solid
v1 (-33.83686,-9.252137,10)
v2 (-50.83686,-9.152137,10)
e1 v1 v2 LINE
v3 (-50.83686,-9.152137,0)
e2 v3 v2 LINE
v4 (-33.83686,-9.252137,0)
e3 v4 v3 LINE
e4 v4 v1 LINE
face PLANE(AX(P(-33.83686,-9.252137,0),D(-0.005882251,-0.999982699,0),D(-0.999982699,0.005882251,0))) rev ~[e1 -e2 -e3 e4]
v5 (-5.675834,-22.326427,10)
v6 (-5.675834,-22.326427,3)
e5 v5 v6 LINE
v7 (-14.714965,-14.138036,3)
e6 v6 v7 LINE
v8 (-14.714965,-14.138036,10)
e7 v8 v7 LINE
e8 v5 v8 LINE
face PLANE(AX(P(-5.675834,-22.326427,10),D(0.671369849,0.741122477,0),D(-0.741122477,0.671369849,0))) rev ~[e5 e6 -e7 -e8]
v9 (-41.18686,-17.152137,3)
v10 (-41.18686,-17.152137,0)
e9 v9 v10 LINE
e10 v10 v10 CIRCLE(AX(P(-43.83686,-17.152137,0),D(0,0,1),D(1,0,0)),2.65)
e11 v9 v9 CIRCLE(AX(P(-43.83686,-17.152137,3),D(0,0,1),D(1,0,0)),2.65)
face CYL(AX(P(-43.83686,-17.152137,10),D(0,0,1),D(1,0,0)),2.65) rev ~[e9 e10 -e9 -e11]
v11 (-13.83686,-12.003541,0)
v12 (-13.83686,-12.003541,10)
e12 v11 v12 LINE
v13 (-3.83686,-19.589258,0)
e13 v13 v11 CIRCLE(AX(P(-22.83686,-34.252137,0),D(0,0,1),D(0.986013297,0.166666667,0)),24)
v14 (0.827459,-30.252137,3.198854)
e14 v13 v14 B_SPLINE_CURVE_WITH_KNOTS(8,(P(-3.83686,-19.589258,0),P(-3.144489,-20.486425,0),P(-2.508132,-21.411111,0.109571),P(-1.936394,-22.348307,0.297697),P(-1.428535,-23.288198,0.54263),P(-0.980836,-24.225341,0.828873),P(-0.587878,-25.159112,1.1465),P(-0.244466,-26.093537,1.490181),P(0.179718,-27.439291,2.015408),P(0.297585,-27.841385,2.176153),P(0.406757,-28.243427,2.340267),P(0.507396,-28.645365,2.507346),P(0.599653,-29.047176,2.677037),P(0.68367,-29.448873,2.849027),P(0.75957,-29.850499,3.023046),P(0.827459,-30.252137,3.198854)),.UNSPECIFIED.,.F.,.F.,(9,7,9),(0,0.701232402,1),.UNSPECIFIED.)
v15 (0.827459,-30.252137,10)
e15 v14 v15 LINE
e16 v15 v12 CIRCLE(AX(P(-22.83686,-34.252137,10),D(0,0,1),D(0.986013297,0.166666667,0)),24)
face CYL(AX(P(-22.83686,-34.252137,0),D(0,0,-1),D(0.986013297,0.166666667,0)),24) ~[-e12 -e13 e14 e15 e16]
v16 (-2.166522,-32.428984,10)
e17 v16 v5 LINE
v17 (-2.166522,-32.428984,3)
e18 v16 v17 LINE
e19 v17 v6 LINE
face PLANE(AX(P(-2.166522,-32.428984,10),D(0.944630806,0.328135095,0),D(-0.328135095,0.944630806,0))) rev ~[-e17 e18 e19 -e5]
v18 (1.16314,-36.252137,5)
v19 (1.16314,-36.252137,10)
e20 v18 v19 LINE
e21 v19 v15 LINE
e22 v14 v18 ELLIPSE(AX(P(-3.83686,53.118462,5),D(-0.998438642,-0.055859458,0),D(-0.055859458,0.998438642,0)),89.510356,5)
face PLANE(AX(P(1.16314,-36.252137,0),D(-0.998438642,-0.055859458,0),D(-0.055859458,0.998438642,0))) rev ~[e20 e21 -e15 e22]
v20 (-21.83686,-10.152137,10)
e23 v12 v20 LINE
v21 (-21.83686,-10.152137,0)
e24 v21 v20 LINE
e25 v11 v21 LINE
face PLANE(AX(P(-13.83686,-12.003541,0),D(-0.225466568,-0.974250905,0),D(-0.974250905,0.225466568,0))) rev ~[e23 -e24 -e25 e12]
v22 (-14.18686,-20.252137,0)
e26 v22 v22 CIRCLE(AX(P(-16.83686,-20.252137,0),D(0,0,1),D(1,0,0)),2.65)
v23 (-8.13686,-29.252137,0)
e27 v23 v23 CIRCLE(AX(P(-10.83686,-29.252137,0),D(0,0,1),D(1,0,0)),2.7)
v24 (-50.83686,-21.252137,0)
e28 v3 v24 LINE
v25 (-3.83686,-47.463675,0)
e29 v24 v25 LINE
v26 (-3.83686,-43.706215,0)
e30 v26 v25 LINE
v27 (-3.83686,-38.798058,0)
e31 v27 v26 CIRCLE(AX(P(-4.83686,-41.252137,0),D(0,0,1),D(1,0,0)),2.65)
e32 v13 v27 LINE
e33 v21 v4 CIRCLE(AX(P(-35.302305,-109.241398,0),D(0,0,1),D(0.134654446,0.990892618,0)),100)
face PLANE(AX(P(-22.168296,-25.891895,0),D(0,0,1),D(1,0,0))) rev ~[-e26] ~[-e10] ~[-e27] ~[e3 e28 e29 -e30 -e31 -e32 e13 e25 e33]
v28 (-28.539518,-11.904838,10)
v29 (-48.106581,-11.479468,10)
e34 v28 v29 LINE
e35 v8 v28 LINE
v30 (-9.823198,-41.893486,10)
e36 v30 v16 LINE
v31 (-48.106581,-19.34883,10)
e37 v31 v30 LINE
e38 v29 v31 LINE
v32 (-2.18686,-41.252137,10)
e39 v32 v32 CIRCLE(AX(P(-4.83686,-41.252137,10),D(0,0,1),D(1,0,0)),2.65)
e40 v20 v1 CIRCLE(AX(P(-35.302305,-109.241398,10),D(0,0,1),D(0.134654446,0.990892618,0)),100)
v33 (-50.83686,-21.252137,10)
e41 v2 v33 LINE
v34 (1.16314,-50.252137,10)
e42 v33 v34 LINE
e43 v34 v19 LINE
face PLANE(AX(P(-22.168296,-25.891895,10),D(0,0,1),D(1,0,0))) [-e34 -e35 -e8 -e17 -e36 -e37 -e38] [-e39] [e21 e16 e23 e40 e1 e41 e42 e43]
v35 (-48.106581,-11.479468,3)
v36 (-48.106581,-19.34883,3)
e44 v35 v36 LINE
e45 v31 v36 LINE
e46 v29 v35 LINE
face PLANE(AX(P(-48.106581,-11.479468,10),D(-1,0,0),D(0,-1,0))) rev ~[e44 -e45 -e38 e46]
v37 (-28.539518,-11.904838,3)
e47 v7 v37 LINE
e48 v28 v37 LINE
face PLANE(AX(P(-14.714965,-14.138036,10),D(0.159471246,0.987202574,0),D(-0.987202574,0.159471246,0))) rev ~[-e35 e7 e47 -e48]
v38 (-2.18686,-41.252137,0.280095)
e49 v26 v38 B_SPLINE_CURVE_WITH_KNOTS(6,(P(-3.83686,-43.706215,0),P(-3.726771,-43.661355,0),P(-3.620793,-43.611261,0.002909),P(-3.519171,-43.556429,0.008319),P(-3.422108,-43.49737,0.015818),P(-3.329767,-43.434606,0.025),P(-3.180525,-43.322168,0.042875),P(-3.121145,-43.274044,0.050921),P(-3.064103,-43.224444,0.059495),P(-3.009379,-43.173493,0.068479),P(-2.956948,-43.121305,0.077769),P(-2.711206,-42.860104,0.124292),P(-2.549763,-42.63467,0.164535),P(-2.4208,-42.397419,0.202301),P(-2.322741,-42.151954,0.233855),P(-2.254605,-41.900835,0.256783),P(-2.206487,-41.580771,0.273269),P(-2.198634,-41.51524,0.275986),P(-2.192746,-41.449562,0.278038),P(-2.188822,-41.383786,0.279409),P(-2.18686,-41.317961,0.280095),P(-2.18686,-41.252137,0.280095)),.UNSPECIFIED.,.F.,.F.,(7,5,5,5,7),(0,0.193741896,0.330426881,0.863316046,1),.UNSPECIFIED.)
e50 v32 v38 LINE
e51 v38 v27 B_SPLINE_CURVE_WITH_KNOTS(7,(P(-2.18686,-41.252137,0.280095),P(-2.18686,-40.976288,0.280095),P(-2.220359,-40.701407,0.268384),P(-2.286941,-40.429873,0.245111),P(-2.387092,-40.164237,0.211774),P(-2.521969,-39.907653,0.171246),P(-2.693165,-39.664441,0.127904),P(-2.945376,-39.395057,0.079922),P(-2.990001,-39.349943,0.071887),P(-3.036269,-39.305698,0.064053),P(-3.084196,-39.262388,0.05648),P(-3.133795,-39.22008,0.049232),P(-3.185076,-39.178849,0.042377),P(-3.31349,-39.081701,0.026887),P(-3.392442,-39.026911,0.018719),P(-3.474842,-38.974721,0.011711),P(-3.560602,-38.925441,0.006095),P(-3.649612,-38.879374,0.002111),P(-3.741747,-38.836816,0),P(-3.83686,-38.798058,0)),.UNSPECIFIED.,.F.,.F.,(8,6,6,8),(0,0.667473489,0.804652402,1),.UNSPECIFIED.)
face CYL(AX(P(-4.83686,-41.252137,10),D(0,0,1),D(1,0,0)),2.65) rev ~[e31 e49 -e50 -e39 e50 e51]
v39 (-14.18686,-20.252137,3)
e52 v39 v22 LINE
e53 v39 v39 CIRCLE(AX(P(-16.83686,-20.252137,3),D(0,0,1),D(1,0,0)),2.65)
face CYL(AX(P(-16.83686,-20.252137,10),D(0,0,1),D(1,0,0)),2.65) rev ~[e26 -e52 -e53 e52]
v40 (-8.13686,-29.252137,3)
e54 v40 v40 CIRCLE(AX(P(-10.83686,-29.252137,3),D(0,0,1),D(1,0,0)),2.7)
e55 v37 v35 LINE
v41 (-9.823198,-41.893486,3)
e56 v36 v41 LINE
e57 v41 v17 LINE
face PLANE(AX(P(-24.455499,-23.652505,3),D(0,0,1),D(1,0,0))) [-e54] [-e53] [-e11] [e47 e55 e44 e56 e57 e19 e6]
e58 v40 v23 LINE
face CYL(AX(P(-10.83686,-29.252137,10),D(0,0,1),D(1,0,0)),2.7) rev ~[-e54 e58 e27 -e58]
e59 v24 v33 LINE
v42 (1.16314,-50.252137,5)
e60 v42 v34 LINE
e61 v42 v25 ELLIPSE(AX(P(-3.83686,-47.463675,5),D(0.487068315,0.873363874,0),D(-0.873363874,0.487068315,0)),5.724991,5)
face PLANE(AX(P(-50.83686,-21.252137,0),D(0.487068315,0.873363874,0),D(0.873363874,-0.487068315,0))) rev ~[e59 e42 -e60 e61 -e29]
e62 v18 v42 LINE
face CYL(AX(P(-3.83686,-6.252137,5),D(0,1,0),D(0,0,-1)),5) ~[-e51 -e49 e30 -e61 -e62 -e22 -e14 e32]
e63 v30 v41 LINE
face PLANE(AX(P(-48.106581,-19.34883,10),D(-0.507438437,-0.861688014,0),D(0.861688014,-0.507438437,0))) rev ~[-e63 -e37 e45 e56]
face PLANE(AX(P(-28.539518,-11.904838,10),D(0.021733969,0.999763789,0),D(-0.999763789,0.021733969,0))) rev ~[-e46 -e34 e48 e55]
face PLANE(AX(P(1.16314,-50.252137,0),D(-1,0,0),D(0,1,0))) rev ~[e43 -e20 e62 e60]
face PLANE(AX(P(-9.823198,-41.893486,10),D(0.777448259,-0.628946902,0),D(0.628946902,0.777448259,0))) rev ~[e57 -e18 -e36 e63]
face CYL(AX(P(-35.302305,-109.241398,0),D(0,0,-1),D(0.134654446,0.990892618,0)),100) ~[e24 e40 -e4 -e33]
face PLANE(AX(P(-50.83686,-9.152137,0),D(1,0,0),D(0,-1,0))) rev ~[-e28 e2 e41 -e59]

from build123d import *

# Parameters (mm, degrees)
F1_DEPTH    = 10
F2_R        = 2.65
F2_R_2      = 2.7
F3_DEPTH    = 10.001
F4_T1_DEPTH = 74
F6_DEPTH    = 7


# Not quite as in the source:
# - a fillet or chamfer that OpenCascade refuses, or shapes differently, is made with other operations: its cross-section is extruded or revolved along the edge and cut away or added


with BuildPart() as f1:
    # F0 (on Top) → F1 (new body)
    with BuildSketch(Plane.XY):
        with BuildLine():
            Line((-33.8368600405, -9.2521366523), (-50.8368600405, -9.1521366523))
            Line((-50.8368600405, -9.1521366523), (-50.8368600405, -21.2521366523))
            Line((-50.8368600405, -21.2521366523), (1.1631399595, -50.2521366523))
            Line((1.1631399595, -50.2521366523), (1.1631399595, -36.2521366523))
            Line((1.1631399595, -36.2521366523), (0.8274590919, -30.2521366523))
            ThreePointArc((0.8274590919, -30.2521366523), (-4.1287803642, -19.2185823544), (-13.8368600405, -12.003541191))
            Line((-13.8368600405, -12.003541191), (-21.8368600405, -10.1521366523))
            ThreePointArc((-21.8368600405, -10.1521366523), (-27.8233098501, -9.521467447), (-33.8368600405, -9.2521366523))
        make_face()
    extrude(amount=F1_DEPTH)

    # F2 (on face) → F3 (cut, through all)
    with BuildSketch(Plane.XY.offset(10)):
        with Locations((-43.8368600405, -17.1521366523)):
            Circle(F2_R)
        with Locations((-16.8368600405, -20.2521366523)):
            Circle(F2_R)
        with Locations((-4.8368600405, -41.2521366523)):
            Circle(F2_R)
        with Locations((-10.8368600405, -29.2521366523)):
            Circle(F2_R_2)
    extrude(amount=-F3_DEPTH, mode=Mode.SUBTRACT)

    # F4: fillet of radius 5 on 1 edges, made by hand

    # F4_s2 → F4_t1 (cut)
    with BuildSketch(Plane.XZ.offset(6.2521366523)):
        with BuildLine():
            ThreePointArc((-3.8368600405, 0), (-0.3013261345, 1.4644660941), (1.1631399595, 5))
            Line((1.1631399595, 5), (1.2631399595, 5))
            Line((1.2631399595, 5), (1.2631399595, -0.1))
            Line((1.2631399595, -0.1), (-3.8368600405, -0.1))
            Line((-3.8368600405, -0.1), (-3.8368600405, 0))
        make_face()
    extrude(amount=F4_T1_DEPTH, mode=Mode.SUBTRACT)

    # F5 (on face) → F6 (cut)
    with BuildSketch(Plane.XY.offset(10)):
        Polygon((-28.5395178944, -11.904838495), (-48.1065809727, -11.4794680849), (-48.1065809727, -19.3488299847), (-9.8231984302, -41.8934859335), (-2.166522434, -32.4289835989), (-5.6758336723, -22.3264265805), (-14.7149646655, -14.1380364075), align=None)
    extrude(amount=-F6_DEPTH, mode=Mode.SUBTRACT)


solid = f1.part
